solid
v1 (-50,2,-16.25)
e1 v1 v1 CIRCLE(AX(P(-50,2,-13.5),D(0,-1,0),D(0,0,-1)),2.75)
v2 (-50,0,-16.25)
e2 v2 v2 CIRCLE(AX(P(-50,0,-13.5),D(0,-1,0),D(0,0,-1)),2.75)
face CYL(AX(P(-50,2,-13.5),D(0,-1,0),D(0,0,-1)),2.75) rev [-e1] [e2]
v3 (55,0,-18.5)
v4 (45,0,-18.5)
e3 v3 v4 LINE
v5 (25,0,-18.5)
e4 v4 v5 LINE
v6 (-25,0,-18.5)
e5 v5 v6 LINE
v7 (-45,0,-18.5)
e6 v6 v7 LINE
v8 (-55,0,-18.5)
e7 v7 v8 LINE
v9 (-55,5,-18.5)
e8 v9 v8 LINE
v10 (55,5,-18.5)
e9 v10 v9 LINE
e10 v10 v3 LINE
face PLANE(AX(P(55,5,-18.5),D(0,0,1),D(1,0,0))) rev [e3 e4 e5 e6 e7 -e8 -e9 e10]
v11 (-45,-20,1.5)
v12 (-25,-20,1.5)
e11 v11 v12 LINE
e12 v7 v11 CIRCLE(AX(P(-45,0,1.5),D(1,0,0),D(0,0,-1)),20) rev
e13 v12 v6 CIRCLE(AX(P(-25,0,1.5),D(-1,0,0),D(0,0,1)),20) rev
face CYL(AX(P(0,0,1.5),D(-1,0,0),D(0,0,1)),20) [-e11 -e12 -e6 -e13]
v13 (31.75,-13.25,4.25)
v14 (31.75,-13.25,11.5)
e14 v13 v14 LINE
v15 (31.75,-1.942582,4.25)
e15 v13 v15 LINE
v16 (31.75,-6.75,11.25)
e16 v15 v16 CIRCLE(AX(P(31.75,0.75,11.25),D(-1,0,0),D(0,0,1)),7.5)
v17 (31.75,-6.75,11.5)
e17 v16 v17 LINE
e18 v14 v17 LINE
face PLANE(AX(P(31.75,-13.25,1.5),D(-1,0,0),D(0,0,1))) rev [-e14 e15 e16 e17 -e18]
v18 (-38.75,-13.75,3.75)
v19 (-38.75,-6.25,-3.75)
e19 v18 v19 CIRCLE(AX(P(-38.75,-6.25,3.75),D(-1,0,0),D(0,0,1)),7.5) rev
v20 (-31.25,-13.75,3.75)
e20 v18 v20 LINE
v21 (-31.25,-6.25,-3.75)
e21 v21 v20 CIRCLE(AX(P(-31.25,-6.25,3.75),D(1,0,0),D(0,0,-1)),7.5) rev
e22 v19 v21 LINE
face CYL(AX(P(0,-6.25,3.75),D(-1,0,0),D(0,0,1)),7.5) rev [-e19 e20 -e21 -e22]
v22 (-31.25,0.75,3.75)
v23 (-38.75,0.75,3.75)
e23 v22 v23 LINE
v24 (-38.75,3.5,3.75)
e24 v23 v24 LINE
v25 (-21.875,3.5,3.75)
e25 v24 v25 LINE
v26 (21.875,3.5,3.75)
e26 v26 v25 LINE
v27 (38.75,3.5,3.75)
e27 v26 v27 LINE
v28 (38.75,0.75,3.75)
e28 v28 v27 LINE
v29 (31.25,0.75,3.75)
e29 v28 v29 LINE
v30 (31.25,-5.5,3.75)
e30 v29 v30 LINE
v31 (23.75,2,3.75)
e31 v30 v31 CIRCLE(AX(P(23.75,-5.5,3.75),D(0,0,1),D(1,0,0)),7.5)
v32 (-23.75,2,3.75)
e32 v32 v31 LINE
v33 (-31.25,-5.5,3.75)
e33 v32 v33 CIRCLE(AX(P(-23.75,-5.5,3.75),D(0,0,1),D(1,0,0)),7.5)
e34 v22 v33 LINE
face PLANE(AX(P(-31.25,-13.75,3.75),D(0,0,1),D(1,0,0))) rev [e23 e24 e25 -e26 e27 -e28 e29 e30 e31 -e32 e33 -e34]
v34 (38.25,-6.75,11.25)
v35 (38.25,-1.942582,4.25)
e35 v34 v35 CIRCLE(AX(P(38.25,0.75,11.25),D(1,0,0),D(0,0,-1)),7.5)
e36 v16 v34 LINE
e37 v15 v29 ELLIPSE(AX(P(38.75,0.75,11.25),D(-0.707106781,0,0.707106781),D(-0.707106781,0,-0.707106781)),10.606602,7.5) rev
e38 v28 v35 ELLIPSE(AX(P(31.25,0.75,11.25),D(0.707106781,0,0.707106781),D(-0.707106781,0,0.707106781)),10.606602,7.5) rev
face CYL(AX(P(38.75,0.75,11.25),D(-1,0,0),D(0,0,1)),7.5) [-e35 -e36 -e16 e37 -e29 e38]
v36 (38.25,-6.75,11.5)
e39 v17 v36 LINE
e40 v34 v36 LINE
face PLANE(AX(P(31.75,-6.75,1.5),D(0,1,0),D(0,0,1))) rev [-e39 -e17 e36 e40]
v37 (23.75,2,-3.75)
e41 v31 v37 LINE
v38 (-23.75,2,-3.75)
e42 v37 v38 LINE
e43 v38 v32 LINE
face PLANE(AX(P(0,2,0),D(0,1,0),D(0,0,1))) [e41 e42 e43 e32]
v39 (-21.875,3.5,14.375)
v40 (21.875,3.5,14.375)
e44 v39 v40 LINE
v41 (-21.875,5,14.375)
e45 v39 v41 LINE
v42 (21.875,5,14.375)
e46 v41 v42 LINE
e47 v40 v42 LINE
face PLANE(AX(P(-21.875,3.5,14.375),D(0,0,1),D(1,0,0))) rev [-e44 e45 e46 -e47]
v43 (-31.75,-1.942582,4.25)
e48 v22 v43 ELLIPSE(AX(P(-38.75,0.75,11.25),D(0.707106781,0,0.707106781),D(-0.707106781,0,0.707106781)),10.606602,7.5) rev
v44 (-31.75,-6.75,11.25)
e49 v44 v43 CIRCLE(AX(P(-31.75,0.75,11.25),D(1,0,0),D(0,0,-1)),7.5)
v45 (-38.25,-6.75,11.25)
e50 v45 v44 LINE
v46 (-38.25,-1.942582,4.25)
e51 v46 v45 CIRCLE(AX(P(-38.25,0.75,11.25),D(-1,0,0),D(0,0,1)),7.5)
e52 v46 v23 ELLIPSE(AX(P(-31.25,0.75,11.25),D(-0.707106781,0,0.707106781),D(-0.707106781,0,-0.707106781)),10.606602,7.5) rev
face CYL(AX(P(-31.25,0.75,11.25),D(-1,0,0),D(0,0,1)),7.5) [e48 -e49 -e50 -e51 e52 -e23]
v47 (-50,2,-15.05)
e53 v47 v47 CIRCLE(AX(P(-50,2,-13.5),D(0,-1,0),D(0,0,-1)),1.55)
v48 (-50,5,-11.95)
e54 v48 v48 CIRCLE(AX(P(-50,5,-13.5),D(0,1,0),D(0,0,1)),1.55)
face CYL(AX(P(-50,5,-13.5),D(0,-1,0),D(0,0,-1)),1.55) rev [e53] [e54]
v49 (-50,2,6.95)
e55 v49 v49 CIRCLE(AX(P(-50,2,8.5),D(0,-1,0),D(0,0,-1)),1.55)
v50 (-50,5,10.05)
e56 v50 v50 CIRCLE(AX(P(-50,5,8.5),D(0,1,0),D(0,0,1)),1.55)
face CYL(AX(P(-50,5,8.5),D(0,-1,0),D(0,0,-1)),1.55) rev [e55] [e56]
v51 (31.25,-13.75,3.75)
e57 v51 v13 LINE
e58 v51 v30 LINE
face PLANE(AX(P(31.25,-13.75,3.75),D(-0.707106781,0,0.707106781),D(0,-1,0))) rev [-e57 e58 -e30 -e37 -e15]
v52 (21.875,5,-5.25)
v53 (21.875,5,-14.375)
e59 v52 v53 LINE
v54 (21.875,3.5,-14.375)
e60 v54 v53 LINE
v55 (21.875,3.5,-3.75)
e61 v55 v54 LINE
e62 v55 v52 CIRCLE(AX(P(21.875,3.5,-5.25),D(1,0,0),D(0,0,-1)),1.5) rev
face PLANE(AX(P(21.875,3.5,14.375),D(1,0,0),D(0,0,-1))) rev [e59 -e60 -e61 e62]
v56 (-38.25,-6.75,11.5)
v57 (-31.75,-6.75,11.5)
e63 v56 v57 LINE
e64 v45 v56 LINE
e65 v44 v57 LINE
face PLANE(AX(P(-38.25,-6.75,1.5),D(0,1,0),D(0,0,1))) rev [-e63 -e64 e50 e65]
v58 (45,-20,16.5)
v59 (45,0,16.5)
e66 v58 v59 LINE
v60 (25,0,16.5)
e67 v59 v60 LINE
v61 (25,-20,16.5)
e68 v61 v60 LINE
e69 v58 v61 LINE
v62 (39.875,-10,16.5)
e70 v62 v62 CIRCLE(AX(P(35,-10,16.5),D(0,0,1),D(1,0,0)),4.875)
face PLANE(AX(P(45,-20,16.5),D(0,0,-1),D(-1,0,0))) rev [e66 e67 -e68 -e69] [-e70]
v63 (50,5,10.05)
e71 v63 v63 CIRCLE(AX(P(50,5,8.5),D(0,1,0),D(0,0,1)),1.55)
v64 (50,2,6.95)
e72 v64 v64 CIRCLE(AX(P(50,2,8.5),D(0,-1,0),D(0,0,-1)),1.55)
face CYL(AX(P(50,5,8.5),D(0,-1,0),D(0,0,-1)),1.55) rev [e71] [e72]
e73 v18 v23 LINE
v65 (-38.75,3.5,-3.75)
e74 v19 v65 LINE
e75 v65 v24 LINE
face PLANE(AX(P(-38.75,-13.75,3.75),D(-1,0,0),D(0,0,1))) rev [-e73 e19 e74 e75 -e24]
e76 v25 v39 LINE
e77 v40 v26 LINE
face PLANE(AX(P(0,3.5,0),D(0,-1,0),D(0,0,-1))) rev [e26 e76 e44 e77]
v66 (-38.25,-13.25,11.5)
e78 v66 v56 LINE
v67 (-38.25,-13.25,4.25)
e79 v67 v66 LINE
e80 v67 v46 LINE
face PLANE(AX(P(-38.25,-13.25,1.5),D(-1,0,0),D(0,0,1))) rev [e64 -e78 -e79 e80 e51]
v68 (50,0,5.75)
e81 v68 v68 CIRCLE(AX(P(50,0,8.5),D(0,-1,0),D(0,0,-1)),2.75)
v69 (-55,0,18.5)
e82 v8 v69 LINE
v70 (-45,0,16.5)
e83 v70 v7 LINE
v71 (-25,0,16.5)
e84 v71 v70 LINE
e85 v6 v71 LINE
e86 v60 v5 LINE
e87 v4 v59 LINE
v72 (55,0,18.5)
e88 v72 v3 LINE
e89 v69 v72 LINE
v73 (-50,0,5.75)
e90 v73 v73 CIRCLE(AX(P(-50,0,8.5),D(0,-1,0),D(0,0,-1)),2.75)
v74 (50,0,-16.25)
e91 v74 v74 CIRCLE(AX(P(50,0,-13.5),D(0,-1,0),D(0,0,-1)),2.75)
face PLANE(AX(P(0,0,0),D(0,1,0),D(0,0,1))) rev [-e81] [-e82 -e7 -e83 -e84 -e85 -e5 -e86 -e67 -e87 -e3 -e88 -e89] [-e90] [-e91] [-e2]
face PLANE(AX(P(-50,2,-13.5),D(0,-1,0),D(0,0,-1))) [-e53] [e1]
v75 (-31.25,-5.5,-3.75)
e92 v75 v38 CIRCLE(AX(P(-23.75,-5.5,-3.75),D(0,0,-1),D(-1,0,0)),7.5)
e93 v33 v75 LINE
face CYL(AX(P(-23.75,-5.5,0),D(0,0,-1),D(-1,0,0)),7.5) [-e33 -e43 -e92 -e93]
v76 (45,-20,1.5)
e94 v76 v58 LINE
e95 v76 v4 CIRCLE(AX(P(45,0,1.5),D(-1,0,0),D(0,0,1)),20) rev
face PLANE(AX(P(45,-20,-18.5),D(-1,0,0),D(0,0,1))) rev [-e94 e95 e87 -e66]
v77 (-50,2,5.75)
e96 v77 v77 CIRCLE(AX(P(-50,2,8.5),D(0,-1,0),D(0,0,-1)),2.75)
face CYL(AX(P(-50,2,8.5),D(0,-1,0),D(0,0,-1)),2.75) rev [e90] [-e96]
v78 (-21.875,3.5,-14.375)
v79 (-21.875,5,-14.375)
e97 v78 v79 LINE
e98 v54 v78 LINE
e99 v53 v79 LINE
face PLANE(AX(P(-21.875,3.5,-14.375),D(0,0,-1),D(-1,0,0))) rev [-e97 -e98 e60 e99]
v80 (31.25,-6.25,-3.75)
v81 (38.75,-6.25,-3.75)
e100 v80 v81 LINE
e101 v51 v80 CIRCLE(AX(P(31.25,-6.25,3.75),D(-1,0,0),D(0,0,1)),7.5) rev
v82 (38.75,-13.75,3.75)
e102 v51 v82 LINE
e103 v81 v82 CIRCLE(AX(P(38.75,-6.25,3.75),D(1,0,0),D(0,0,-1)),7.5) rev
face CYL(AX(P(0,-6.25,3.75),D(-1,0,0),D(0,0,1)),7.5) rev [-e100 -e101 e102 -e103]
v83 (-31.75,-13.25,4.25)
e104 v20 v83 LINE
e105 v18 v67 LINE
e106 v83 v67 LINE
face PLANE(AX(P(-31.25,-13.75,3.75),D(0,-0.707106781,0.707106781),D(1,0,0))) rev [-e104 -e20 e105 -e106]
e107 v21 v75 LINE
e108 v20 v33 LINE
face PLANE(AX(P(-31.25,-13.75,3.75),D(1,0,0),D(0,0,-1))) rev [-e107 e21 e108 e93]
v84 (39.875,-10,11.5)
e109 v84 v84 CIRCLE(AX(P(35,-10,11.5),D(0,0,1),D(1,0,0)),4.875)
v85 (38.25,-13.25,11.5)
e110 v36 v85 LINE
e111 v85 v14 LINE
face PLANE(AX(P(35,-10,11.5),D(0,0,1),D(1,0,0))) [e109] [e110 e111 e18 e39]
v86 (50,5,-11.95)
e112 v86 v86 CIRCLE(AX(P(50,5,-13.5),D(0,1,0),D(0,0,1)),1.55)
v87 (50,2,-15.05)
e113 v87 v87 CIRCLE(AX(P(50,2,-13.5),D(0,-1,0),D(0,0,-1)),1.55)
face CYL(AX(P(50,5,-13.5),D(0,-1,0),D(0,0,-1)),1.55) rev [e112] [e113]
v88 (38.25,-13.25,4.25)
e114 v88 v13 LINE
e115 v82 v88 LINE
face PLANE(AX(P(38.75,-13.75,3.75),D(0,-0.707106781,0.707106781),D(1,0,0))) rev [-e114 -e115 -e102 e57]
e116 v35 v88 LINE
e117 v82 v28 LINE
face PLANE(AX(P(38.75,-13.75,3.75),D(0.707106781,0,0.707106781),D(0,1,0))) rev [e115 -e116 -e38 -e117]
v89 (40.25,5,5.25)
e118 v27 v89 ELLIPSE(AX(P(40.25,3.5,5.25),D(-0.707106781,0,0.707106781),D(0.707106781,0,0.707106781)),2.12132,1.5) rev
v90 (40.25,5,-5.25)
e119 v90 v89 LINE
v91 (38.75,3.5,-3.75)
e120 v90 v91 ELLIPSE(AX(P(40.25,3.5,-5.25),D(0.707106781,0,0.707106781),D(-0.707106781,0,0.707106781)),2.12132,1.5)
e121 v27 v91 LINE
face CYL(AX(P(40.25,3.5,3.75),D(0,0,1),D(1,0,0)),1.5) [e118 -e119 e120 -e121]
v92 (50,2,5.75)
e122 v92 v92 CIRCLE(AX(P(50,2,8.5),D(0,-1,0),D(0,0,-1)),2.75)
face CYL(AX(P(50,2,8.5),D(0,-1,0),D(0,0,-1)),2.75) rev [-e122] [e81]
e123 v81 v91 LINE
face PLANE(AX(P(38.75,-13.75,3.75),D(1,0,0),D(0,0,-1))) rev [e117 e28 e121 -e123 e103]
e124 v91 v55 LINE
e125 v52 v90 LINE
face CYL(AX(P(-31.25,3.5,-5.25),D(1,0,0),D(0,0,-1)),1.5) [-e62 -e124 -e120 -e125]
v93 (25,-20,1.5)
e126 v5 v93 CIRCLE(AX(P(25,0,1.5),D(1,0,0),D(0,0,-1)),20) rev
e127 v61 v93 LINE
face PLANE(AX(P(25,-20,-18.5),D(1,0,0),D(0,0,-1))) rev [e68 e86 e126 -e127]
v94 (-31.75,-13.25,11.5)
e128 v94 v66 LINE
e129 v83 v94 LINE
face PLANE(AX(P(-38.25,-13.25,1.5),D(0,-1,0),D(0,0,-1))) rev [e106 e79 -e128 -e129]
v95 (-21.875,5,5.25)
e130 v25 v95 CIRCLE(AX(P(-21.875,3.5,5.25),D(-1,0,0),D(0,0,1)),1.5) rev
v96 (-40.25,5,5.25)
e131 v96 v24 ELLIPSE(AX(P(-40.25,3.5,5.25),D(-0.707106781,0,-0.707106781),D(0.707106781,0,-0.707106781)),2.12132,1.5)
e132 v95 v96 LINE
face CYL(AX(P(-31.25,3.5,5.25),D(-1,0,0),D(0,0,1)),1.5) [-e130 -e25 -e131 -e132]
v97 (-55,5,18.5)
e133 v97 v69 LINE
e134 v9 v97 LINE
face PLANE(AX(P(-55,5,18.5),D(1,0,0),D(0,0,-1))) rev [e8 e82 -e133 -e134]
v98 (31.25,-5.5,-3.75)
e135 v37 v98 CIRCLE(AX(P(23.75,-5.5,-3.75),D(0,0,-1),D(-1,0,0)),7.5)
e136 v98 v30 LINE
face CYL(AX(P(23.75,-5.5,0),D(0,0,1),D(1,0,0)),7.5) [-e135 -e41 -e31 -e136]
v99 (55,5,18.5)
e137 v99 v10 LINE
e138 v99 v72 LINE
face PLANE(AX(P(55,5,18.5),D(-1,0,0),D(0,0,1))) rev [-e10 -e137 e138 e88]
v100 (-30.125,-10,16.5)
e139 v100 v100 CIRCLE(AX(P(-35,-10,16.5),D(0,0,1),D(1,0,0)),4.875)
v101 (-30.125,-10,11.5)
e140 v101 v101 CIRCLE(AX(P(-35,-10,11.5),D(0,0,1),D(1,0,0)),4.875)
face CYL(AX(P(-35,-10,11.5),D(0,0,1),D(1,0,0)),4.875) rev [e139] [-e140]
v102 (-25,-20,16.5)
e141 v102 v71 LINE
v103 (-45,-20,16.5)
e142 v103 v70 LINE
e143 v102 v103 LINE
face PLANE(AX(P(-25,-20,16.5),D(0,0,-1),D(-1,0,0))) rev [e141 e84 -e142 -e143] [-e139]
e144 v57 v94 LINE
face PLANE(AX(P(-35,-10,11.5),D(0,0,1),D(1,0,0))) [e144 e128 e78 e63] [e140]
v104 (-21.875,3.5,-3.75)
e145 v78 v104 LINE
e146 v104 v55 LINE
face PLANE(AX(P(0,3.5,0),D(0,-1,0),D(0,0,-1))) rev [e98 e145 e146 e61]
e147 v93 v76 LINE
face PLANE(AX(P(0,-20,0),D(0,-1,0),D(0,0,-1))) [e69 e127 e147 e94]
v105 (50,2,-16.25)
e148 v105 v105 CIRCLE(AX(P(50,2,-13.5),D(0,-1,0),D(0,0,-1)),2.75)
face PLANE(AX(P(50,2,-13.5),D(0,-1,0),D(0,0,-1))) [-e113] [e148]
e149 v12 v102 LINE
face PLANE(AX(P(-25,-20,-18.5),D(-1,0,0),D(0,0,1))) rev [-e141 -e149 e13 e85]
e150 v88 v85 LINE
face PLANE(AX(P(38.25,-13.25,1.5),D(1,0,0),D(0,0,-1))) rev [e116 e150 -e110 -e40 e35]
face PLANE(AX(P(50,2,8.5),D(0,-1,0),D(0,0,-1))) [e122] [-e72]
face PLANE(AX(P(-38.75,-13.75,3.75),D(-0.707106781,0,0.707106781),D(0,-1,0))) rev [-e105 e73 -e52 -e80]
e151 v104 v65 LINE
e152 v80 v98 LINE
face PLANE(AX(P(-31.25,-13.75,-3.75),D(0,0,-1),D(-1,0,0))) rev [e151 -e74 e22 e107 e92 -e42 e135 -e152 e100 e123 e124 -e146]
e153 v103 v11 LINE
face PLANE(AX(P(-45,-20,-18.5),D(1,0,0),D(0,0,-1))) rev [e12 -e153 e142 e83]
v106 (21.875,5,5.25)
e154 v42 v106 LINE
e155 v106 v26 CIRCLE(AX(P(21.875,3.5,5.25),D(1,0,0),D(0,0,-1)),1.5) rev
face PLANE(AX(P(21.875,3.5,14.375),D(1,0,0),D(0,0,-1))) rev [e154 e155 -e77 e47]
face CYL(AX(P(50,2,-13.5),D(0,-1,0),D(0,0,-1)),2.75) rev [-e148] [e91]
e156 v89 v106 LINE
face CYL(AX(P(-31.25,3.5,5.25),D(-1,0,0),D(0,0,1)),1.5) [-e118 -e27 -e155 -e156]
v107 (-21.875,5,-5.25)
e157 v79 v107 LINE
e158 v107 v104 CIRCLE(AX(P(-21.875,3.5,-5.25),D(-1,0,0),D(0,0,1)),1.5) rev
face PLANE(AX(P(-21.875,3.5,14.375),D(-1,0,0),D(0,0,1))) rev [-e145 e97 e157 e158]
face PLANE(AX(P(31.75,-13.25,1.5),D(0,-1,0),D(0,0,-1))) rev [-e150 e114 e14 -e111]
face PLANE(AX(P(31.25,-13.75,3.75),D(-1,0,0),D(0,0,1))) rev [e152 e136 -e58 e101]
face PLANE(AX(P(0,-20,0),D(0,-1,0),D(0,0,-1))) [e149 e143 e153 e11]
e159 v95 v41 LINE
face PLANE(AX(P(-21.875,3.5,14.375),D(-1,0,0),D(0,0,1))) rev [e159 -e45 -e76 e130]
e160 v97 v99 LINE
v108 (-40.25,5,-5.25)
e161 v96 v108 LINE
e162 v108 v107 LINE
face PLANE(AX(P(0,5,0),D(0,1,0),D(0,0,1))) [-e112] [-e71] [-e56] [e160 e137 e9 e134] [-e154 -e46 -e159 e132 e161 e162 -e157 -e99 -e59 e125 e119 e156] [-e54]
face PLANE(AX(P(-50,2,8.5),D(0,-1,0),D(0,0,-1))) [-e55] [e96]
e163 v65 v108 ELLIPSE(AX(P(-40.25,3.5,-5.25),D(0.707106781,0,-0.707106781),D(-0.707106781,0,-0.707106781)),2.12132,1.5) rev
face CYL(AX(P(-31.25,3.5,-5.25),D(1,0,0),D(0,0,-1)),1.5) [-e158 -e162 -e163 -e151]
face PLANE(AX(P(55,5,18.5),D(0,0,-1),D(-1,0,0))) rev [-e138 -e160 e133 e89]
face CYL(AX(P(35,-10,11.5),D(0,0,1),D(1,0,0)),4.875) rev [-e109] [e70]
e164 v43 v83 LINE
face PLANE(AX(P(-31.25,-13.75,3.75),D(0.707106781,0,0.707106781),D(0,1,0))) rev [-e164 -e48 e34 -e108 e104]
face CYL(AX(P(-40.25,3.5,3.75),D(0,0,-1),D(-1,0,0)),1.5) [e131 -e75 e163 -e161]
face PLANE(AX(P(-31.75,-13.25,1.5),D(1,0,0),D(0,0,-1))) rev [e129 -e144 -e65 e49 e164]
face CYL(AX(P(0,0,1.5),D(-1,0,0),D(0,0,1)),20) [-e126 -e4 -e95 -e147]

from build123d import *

# Parameters (mm, degrees)
SKETCH1_W           = 110
SKETCH1_H           = 37
SKETCH1_R           = 1.55
BOSS_EXTRUDE1_DEPTH = 5
SKETCH2_W           = 43.75
SKETCH2_H           = 28.75
CUT_EXTRUDE1_DEPTH  = 1.5
SKETCH3_W           = 20
SKETCH3_H           = 35
BOSS_EXTRUDE2_DEPTH = 20
FILLET1_R           = 20
SKETCH4_W           = 7.5
SKETCH4_H           = 7.5
CUT_EXTRUDE2_DEPTH  = 18.75
SKETCH5_W           = 6.5
SKETCH5_H           = 6.5
CUT_EXTRUDE3_DEPTH  = 15
FILLET2_R           = 7.5
CHAMFER1_SIZE       = 0.5
SKETCH7_R           = 4.875
CUT_EXTRUDE5_DEPTH  = 5
SKETCH8_R           = 2.75
CUT_EXTRUDE6_DEPTH  = 2
SKETCH9_W           = 62.5
SKETCH9_H           = 7.5
CUT_EXTRUDE7_DEPTH  = 3
FILLET3_R           = 7.5
FILLET4_R           = 1.5


with BuildPart() as part:
    # Sketch1 → Boss-Extrude1 (new body)
    with BuildSketch(Plane(origin=(0, 0, 0), x_dir=(1, 0, 0), z_dir=(0, 1, 0))):
        Rectangle(SKETCH1_W, SKETCH1_H)
        with Locations(Location((50, -8.5, 0), (0, 0, 270))):
            Circle(SKETCH1_R, mode=Mode.SUBTRACT)
        with Locations(Location((50, 13.5, 0), (0, 0, 270))):
            Circle(SKETCH1_R, mode=Mode.SUBTRACT)
        with Locations(Location((-50, 13.5, 0), (0, 0, 270))):
            Circle(SKETCH1_R, mode=Mode.SUBTRACT)
        with Locations(Location((-50, -8.5, 0), (0, 0, 270))):
            Circle(SKETCH1_R, mode=Mode.SUBTRACT)
    extrude(amount=BOSS_EXTRUDE1_DEPTH)

    # Sketch2 → Cut-Extrude1 (cut)
    with BuildSketch(Plane(origin=(0, 5, 0), x_dir=(1, 0, 0), z_dir=(0, 1, 0))):
        Rectangle(SKETCH2_W, SKETCH2_H)
    extrude(amount=-CUT_EXTRUDE1_DEPTH, mode=Mode.SUBTRACT)

    # Sketch3 → Boss-Extrude2 (add)
    with BuildSketch(Plane(origin=(0, 0, 0), x_dir=(-1, 0, 0), z_dir=(0, -1, 0))):
        with Locations((35, 1)):
            Rectangle(SKETCH3_W, SKETCH3_H)
        with Locations((-35, 1)):
            Rectangle(SKETCH3_W, SKETCH3_H)
    extrude(amount=BOSS_EXTRUDE2_DEPTH)

    # Fillet1
    fillet1_edges = [part.edges().sort_by_distance(p)[0] for p in [
        (35, -20, -18.5),
        (-35, -20, -18.5),
    ]]
    fillet(fillet1_edges, radius=FILLET1_R)

    # Sketch4 → Cut-Extrude2 (cut)
    with BuildSketch(Plane(origin=(0, 5, 0), x_dir=(1, 0, 0), z_dir=(0, 1, 0))):
        with Locations((-35, 0)):
            Rectangle(SKETCH4_W, SKETCH4_H)
        with Locations((35, 0)):
            Rectangle(SKETCH4_W, SKETCH4_H)
    extrude(amount=-CUT_EXTRUDE2_DEPTH, mode=Mode.SUBTRACT)

    # Sketch5 → Cut-Extrude3 (cut)
    with BuildSketch(Plane.XY.offset(16.5)):
        with Locations((-35, -10)):
            Rectangle(SKETCH5_W, SKETCH5_H)
        with Locations((35, -10)):
            Rectangle(SKETCH5_W, SKETCH5_H)
    extrude(amount=-CUT_EXTRUDE3_DEPTH, mode=Mode.SUBTRACT)

    # Fillet2
    fillet2_edges = [part.edges().sort_by_distance(p)[0] for p in [
        (35, -6.75, 3.75),
        (35, -13.75, -3.75),
        (-35, -13.75, -3.75),
        (-35, -6.75, 3.75),
    ]]
    fillet(fillet2_edges, radius=FILLET2_R - 0.0001)  # a hair under: the kernel refuses the full size

    # Chamfer1
    chamfer1_edges = [part.edges().sort_by_distance(p)[0] for p in [
        (-38.25, -6.25005, 3.75),
        (-35, -13.25, 3.75),
        (-31.75, -6.25005, 3.75),
        (31.75, -6.25005, 3.75),
        (35, -13.25, 3.75),
        (38.25, -6.25005, 3.75),
    ]]
    chamfer(chamfer1_edges, length=CHAMFER1_SIZE - 0.0001)  # a hair under: the kernel refuses the full size

    # Sketch7 → Cut-Extrude5 (cut)
    with BuildSketch(Plane.XY.offset(16.5)):
        with Locations((-35, -10)):
            Circle(SKETCH7_R)
        with Locations((35, -10)):
            Circle(SKETCH7_R)
    extrude(amount=-CUT_EXTRUDE5_DEPTH, mode=Mode.SUBTRACT)

    # Sketch8 → Cut-Extrude6 (cut)
    with BuildSketch(Plane.XZ):
        with Locations(Location((-50, 8.5, 0), (0, 0, 270))):
            Circle(SKETCH8_R)
        with Locations(Location((-50, -13.5, 0), (0, 0, 270))):
            Circle(SKETCH8_R)
        with Locations(Location((50, -13.5, 0), (0, 0, 270))):
            Circle(SKETCH8_R)
        with Locations(Location((50, 8.5, 0), (0, 0, 270))):
            Circle(SKETCH8_R)
    extrude(amount=-CUT_EXTRUDE6_DEPTH, mode=Mode.SUBTRACT)

    # Sketch9 → Cut-Extrude7 (cut)
    with BuildSketch(Plane(origin=(0, 5, 0), x_dir=(1, 0, 0), z_dir=(0, 1, 0))):
        Rectangle(SKETCH9_W, SKETCH9_H)
    extrude(amount=-CUT_EXTRUDE7_DEPTH, mode=Mode.SUBTRACT)

    # Fillet3
    fillet3_edges = [part.edges().sort_by_distance(p)[0] for p in [
        (-31.25, 2, 0),
        (31.25, 2, 0),
    ]]
    fillet(fillet3_edges, radius=FILLET3_R)

    # Fillet4
    fillet4_edges = [part.edges().sort_by_distance(p)[0] for p in [
        (-38.75, 5, 0),
        (-30.3125, 5, -3.75),
        (-30.3125, 5, 3.75),
        (38.75, 5, 0),
        (30.3125, 5, 3.75),
        (30.3125, 5, -3.75),
    ]]
    fillet(fillet4_edges, radius=FILLET4_R)


solid = part.part
